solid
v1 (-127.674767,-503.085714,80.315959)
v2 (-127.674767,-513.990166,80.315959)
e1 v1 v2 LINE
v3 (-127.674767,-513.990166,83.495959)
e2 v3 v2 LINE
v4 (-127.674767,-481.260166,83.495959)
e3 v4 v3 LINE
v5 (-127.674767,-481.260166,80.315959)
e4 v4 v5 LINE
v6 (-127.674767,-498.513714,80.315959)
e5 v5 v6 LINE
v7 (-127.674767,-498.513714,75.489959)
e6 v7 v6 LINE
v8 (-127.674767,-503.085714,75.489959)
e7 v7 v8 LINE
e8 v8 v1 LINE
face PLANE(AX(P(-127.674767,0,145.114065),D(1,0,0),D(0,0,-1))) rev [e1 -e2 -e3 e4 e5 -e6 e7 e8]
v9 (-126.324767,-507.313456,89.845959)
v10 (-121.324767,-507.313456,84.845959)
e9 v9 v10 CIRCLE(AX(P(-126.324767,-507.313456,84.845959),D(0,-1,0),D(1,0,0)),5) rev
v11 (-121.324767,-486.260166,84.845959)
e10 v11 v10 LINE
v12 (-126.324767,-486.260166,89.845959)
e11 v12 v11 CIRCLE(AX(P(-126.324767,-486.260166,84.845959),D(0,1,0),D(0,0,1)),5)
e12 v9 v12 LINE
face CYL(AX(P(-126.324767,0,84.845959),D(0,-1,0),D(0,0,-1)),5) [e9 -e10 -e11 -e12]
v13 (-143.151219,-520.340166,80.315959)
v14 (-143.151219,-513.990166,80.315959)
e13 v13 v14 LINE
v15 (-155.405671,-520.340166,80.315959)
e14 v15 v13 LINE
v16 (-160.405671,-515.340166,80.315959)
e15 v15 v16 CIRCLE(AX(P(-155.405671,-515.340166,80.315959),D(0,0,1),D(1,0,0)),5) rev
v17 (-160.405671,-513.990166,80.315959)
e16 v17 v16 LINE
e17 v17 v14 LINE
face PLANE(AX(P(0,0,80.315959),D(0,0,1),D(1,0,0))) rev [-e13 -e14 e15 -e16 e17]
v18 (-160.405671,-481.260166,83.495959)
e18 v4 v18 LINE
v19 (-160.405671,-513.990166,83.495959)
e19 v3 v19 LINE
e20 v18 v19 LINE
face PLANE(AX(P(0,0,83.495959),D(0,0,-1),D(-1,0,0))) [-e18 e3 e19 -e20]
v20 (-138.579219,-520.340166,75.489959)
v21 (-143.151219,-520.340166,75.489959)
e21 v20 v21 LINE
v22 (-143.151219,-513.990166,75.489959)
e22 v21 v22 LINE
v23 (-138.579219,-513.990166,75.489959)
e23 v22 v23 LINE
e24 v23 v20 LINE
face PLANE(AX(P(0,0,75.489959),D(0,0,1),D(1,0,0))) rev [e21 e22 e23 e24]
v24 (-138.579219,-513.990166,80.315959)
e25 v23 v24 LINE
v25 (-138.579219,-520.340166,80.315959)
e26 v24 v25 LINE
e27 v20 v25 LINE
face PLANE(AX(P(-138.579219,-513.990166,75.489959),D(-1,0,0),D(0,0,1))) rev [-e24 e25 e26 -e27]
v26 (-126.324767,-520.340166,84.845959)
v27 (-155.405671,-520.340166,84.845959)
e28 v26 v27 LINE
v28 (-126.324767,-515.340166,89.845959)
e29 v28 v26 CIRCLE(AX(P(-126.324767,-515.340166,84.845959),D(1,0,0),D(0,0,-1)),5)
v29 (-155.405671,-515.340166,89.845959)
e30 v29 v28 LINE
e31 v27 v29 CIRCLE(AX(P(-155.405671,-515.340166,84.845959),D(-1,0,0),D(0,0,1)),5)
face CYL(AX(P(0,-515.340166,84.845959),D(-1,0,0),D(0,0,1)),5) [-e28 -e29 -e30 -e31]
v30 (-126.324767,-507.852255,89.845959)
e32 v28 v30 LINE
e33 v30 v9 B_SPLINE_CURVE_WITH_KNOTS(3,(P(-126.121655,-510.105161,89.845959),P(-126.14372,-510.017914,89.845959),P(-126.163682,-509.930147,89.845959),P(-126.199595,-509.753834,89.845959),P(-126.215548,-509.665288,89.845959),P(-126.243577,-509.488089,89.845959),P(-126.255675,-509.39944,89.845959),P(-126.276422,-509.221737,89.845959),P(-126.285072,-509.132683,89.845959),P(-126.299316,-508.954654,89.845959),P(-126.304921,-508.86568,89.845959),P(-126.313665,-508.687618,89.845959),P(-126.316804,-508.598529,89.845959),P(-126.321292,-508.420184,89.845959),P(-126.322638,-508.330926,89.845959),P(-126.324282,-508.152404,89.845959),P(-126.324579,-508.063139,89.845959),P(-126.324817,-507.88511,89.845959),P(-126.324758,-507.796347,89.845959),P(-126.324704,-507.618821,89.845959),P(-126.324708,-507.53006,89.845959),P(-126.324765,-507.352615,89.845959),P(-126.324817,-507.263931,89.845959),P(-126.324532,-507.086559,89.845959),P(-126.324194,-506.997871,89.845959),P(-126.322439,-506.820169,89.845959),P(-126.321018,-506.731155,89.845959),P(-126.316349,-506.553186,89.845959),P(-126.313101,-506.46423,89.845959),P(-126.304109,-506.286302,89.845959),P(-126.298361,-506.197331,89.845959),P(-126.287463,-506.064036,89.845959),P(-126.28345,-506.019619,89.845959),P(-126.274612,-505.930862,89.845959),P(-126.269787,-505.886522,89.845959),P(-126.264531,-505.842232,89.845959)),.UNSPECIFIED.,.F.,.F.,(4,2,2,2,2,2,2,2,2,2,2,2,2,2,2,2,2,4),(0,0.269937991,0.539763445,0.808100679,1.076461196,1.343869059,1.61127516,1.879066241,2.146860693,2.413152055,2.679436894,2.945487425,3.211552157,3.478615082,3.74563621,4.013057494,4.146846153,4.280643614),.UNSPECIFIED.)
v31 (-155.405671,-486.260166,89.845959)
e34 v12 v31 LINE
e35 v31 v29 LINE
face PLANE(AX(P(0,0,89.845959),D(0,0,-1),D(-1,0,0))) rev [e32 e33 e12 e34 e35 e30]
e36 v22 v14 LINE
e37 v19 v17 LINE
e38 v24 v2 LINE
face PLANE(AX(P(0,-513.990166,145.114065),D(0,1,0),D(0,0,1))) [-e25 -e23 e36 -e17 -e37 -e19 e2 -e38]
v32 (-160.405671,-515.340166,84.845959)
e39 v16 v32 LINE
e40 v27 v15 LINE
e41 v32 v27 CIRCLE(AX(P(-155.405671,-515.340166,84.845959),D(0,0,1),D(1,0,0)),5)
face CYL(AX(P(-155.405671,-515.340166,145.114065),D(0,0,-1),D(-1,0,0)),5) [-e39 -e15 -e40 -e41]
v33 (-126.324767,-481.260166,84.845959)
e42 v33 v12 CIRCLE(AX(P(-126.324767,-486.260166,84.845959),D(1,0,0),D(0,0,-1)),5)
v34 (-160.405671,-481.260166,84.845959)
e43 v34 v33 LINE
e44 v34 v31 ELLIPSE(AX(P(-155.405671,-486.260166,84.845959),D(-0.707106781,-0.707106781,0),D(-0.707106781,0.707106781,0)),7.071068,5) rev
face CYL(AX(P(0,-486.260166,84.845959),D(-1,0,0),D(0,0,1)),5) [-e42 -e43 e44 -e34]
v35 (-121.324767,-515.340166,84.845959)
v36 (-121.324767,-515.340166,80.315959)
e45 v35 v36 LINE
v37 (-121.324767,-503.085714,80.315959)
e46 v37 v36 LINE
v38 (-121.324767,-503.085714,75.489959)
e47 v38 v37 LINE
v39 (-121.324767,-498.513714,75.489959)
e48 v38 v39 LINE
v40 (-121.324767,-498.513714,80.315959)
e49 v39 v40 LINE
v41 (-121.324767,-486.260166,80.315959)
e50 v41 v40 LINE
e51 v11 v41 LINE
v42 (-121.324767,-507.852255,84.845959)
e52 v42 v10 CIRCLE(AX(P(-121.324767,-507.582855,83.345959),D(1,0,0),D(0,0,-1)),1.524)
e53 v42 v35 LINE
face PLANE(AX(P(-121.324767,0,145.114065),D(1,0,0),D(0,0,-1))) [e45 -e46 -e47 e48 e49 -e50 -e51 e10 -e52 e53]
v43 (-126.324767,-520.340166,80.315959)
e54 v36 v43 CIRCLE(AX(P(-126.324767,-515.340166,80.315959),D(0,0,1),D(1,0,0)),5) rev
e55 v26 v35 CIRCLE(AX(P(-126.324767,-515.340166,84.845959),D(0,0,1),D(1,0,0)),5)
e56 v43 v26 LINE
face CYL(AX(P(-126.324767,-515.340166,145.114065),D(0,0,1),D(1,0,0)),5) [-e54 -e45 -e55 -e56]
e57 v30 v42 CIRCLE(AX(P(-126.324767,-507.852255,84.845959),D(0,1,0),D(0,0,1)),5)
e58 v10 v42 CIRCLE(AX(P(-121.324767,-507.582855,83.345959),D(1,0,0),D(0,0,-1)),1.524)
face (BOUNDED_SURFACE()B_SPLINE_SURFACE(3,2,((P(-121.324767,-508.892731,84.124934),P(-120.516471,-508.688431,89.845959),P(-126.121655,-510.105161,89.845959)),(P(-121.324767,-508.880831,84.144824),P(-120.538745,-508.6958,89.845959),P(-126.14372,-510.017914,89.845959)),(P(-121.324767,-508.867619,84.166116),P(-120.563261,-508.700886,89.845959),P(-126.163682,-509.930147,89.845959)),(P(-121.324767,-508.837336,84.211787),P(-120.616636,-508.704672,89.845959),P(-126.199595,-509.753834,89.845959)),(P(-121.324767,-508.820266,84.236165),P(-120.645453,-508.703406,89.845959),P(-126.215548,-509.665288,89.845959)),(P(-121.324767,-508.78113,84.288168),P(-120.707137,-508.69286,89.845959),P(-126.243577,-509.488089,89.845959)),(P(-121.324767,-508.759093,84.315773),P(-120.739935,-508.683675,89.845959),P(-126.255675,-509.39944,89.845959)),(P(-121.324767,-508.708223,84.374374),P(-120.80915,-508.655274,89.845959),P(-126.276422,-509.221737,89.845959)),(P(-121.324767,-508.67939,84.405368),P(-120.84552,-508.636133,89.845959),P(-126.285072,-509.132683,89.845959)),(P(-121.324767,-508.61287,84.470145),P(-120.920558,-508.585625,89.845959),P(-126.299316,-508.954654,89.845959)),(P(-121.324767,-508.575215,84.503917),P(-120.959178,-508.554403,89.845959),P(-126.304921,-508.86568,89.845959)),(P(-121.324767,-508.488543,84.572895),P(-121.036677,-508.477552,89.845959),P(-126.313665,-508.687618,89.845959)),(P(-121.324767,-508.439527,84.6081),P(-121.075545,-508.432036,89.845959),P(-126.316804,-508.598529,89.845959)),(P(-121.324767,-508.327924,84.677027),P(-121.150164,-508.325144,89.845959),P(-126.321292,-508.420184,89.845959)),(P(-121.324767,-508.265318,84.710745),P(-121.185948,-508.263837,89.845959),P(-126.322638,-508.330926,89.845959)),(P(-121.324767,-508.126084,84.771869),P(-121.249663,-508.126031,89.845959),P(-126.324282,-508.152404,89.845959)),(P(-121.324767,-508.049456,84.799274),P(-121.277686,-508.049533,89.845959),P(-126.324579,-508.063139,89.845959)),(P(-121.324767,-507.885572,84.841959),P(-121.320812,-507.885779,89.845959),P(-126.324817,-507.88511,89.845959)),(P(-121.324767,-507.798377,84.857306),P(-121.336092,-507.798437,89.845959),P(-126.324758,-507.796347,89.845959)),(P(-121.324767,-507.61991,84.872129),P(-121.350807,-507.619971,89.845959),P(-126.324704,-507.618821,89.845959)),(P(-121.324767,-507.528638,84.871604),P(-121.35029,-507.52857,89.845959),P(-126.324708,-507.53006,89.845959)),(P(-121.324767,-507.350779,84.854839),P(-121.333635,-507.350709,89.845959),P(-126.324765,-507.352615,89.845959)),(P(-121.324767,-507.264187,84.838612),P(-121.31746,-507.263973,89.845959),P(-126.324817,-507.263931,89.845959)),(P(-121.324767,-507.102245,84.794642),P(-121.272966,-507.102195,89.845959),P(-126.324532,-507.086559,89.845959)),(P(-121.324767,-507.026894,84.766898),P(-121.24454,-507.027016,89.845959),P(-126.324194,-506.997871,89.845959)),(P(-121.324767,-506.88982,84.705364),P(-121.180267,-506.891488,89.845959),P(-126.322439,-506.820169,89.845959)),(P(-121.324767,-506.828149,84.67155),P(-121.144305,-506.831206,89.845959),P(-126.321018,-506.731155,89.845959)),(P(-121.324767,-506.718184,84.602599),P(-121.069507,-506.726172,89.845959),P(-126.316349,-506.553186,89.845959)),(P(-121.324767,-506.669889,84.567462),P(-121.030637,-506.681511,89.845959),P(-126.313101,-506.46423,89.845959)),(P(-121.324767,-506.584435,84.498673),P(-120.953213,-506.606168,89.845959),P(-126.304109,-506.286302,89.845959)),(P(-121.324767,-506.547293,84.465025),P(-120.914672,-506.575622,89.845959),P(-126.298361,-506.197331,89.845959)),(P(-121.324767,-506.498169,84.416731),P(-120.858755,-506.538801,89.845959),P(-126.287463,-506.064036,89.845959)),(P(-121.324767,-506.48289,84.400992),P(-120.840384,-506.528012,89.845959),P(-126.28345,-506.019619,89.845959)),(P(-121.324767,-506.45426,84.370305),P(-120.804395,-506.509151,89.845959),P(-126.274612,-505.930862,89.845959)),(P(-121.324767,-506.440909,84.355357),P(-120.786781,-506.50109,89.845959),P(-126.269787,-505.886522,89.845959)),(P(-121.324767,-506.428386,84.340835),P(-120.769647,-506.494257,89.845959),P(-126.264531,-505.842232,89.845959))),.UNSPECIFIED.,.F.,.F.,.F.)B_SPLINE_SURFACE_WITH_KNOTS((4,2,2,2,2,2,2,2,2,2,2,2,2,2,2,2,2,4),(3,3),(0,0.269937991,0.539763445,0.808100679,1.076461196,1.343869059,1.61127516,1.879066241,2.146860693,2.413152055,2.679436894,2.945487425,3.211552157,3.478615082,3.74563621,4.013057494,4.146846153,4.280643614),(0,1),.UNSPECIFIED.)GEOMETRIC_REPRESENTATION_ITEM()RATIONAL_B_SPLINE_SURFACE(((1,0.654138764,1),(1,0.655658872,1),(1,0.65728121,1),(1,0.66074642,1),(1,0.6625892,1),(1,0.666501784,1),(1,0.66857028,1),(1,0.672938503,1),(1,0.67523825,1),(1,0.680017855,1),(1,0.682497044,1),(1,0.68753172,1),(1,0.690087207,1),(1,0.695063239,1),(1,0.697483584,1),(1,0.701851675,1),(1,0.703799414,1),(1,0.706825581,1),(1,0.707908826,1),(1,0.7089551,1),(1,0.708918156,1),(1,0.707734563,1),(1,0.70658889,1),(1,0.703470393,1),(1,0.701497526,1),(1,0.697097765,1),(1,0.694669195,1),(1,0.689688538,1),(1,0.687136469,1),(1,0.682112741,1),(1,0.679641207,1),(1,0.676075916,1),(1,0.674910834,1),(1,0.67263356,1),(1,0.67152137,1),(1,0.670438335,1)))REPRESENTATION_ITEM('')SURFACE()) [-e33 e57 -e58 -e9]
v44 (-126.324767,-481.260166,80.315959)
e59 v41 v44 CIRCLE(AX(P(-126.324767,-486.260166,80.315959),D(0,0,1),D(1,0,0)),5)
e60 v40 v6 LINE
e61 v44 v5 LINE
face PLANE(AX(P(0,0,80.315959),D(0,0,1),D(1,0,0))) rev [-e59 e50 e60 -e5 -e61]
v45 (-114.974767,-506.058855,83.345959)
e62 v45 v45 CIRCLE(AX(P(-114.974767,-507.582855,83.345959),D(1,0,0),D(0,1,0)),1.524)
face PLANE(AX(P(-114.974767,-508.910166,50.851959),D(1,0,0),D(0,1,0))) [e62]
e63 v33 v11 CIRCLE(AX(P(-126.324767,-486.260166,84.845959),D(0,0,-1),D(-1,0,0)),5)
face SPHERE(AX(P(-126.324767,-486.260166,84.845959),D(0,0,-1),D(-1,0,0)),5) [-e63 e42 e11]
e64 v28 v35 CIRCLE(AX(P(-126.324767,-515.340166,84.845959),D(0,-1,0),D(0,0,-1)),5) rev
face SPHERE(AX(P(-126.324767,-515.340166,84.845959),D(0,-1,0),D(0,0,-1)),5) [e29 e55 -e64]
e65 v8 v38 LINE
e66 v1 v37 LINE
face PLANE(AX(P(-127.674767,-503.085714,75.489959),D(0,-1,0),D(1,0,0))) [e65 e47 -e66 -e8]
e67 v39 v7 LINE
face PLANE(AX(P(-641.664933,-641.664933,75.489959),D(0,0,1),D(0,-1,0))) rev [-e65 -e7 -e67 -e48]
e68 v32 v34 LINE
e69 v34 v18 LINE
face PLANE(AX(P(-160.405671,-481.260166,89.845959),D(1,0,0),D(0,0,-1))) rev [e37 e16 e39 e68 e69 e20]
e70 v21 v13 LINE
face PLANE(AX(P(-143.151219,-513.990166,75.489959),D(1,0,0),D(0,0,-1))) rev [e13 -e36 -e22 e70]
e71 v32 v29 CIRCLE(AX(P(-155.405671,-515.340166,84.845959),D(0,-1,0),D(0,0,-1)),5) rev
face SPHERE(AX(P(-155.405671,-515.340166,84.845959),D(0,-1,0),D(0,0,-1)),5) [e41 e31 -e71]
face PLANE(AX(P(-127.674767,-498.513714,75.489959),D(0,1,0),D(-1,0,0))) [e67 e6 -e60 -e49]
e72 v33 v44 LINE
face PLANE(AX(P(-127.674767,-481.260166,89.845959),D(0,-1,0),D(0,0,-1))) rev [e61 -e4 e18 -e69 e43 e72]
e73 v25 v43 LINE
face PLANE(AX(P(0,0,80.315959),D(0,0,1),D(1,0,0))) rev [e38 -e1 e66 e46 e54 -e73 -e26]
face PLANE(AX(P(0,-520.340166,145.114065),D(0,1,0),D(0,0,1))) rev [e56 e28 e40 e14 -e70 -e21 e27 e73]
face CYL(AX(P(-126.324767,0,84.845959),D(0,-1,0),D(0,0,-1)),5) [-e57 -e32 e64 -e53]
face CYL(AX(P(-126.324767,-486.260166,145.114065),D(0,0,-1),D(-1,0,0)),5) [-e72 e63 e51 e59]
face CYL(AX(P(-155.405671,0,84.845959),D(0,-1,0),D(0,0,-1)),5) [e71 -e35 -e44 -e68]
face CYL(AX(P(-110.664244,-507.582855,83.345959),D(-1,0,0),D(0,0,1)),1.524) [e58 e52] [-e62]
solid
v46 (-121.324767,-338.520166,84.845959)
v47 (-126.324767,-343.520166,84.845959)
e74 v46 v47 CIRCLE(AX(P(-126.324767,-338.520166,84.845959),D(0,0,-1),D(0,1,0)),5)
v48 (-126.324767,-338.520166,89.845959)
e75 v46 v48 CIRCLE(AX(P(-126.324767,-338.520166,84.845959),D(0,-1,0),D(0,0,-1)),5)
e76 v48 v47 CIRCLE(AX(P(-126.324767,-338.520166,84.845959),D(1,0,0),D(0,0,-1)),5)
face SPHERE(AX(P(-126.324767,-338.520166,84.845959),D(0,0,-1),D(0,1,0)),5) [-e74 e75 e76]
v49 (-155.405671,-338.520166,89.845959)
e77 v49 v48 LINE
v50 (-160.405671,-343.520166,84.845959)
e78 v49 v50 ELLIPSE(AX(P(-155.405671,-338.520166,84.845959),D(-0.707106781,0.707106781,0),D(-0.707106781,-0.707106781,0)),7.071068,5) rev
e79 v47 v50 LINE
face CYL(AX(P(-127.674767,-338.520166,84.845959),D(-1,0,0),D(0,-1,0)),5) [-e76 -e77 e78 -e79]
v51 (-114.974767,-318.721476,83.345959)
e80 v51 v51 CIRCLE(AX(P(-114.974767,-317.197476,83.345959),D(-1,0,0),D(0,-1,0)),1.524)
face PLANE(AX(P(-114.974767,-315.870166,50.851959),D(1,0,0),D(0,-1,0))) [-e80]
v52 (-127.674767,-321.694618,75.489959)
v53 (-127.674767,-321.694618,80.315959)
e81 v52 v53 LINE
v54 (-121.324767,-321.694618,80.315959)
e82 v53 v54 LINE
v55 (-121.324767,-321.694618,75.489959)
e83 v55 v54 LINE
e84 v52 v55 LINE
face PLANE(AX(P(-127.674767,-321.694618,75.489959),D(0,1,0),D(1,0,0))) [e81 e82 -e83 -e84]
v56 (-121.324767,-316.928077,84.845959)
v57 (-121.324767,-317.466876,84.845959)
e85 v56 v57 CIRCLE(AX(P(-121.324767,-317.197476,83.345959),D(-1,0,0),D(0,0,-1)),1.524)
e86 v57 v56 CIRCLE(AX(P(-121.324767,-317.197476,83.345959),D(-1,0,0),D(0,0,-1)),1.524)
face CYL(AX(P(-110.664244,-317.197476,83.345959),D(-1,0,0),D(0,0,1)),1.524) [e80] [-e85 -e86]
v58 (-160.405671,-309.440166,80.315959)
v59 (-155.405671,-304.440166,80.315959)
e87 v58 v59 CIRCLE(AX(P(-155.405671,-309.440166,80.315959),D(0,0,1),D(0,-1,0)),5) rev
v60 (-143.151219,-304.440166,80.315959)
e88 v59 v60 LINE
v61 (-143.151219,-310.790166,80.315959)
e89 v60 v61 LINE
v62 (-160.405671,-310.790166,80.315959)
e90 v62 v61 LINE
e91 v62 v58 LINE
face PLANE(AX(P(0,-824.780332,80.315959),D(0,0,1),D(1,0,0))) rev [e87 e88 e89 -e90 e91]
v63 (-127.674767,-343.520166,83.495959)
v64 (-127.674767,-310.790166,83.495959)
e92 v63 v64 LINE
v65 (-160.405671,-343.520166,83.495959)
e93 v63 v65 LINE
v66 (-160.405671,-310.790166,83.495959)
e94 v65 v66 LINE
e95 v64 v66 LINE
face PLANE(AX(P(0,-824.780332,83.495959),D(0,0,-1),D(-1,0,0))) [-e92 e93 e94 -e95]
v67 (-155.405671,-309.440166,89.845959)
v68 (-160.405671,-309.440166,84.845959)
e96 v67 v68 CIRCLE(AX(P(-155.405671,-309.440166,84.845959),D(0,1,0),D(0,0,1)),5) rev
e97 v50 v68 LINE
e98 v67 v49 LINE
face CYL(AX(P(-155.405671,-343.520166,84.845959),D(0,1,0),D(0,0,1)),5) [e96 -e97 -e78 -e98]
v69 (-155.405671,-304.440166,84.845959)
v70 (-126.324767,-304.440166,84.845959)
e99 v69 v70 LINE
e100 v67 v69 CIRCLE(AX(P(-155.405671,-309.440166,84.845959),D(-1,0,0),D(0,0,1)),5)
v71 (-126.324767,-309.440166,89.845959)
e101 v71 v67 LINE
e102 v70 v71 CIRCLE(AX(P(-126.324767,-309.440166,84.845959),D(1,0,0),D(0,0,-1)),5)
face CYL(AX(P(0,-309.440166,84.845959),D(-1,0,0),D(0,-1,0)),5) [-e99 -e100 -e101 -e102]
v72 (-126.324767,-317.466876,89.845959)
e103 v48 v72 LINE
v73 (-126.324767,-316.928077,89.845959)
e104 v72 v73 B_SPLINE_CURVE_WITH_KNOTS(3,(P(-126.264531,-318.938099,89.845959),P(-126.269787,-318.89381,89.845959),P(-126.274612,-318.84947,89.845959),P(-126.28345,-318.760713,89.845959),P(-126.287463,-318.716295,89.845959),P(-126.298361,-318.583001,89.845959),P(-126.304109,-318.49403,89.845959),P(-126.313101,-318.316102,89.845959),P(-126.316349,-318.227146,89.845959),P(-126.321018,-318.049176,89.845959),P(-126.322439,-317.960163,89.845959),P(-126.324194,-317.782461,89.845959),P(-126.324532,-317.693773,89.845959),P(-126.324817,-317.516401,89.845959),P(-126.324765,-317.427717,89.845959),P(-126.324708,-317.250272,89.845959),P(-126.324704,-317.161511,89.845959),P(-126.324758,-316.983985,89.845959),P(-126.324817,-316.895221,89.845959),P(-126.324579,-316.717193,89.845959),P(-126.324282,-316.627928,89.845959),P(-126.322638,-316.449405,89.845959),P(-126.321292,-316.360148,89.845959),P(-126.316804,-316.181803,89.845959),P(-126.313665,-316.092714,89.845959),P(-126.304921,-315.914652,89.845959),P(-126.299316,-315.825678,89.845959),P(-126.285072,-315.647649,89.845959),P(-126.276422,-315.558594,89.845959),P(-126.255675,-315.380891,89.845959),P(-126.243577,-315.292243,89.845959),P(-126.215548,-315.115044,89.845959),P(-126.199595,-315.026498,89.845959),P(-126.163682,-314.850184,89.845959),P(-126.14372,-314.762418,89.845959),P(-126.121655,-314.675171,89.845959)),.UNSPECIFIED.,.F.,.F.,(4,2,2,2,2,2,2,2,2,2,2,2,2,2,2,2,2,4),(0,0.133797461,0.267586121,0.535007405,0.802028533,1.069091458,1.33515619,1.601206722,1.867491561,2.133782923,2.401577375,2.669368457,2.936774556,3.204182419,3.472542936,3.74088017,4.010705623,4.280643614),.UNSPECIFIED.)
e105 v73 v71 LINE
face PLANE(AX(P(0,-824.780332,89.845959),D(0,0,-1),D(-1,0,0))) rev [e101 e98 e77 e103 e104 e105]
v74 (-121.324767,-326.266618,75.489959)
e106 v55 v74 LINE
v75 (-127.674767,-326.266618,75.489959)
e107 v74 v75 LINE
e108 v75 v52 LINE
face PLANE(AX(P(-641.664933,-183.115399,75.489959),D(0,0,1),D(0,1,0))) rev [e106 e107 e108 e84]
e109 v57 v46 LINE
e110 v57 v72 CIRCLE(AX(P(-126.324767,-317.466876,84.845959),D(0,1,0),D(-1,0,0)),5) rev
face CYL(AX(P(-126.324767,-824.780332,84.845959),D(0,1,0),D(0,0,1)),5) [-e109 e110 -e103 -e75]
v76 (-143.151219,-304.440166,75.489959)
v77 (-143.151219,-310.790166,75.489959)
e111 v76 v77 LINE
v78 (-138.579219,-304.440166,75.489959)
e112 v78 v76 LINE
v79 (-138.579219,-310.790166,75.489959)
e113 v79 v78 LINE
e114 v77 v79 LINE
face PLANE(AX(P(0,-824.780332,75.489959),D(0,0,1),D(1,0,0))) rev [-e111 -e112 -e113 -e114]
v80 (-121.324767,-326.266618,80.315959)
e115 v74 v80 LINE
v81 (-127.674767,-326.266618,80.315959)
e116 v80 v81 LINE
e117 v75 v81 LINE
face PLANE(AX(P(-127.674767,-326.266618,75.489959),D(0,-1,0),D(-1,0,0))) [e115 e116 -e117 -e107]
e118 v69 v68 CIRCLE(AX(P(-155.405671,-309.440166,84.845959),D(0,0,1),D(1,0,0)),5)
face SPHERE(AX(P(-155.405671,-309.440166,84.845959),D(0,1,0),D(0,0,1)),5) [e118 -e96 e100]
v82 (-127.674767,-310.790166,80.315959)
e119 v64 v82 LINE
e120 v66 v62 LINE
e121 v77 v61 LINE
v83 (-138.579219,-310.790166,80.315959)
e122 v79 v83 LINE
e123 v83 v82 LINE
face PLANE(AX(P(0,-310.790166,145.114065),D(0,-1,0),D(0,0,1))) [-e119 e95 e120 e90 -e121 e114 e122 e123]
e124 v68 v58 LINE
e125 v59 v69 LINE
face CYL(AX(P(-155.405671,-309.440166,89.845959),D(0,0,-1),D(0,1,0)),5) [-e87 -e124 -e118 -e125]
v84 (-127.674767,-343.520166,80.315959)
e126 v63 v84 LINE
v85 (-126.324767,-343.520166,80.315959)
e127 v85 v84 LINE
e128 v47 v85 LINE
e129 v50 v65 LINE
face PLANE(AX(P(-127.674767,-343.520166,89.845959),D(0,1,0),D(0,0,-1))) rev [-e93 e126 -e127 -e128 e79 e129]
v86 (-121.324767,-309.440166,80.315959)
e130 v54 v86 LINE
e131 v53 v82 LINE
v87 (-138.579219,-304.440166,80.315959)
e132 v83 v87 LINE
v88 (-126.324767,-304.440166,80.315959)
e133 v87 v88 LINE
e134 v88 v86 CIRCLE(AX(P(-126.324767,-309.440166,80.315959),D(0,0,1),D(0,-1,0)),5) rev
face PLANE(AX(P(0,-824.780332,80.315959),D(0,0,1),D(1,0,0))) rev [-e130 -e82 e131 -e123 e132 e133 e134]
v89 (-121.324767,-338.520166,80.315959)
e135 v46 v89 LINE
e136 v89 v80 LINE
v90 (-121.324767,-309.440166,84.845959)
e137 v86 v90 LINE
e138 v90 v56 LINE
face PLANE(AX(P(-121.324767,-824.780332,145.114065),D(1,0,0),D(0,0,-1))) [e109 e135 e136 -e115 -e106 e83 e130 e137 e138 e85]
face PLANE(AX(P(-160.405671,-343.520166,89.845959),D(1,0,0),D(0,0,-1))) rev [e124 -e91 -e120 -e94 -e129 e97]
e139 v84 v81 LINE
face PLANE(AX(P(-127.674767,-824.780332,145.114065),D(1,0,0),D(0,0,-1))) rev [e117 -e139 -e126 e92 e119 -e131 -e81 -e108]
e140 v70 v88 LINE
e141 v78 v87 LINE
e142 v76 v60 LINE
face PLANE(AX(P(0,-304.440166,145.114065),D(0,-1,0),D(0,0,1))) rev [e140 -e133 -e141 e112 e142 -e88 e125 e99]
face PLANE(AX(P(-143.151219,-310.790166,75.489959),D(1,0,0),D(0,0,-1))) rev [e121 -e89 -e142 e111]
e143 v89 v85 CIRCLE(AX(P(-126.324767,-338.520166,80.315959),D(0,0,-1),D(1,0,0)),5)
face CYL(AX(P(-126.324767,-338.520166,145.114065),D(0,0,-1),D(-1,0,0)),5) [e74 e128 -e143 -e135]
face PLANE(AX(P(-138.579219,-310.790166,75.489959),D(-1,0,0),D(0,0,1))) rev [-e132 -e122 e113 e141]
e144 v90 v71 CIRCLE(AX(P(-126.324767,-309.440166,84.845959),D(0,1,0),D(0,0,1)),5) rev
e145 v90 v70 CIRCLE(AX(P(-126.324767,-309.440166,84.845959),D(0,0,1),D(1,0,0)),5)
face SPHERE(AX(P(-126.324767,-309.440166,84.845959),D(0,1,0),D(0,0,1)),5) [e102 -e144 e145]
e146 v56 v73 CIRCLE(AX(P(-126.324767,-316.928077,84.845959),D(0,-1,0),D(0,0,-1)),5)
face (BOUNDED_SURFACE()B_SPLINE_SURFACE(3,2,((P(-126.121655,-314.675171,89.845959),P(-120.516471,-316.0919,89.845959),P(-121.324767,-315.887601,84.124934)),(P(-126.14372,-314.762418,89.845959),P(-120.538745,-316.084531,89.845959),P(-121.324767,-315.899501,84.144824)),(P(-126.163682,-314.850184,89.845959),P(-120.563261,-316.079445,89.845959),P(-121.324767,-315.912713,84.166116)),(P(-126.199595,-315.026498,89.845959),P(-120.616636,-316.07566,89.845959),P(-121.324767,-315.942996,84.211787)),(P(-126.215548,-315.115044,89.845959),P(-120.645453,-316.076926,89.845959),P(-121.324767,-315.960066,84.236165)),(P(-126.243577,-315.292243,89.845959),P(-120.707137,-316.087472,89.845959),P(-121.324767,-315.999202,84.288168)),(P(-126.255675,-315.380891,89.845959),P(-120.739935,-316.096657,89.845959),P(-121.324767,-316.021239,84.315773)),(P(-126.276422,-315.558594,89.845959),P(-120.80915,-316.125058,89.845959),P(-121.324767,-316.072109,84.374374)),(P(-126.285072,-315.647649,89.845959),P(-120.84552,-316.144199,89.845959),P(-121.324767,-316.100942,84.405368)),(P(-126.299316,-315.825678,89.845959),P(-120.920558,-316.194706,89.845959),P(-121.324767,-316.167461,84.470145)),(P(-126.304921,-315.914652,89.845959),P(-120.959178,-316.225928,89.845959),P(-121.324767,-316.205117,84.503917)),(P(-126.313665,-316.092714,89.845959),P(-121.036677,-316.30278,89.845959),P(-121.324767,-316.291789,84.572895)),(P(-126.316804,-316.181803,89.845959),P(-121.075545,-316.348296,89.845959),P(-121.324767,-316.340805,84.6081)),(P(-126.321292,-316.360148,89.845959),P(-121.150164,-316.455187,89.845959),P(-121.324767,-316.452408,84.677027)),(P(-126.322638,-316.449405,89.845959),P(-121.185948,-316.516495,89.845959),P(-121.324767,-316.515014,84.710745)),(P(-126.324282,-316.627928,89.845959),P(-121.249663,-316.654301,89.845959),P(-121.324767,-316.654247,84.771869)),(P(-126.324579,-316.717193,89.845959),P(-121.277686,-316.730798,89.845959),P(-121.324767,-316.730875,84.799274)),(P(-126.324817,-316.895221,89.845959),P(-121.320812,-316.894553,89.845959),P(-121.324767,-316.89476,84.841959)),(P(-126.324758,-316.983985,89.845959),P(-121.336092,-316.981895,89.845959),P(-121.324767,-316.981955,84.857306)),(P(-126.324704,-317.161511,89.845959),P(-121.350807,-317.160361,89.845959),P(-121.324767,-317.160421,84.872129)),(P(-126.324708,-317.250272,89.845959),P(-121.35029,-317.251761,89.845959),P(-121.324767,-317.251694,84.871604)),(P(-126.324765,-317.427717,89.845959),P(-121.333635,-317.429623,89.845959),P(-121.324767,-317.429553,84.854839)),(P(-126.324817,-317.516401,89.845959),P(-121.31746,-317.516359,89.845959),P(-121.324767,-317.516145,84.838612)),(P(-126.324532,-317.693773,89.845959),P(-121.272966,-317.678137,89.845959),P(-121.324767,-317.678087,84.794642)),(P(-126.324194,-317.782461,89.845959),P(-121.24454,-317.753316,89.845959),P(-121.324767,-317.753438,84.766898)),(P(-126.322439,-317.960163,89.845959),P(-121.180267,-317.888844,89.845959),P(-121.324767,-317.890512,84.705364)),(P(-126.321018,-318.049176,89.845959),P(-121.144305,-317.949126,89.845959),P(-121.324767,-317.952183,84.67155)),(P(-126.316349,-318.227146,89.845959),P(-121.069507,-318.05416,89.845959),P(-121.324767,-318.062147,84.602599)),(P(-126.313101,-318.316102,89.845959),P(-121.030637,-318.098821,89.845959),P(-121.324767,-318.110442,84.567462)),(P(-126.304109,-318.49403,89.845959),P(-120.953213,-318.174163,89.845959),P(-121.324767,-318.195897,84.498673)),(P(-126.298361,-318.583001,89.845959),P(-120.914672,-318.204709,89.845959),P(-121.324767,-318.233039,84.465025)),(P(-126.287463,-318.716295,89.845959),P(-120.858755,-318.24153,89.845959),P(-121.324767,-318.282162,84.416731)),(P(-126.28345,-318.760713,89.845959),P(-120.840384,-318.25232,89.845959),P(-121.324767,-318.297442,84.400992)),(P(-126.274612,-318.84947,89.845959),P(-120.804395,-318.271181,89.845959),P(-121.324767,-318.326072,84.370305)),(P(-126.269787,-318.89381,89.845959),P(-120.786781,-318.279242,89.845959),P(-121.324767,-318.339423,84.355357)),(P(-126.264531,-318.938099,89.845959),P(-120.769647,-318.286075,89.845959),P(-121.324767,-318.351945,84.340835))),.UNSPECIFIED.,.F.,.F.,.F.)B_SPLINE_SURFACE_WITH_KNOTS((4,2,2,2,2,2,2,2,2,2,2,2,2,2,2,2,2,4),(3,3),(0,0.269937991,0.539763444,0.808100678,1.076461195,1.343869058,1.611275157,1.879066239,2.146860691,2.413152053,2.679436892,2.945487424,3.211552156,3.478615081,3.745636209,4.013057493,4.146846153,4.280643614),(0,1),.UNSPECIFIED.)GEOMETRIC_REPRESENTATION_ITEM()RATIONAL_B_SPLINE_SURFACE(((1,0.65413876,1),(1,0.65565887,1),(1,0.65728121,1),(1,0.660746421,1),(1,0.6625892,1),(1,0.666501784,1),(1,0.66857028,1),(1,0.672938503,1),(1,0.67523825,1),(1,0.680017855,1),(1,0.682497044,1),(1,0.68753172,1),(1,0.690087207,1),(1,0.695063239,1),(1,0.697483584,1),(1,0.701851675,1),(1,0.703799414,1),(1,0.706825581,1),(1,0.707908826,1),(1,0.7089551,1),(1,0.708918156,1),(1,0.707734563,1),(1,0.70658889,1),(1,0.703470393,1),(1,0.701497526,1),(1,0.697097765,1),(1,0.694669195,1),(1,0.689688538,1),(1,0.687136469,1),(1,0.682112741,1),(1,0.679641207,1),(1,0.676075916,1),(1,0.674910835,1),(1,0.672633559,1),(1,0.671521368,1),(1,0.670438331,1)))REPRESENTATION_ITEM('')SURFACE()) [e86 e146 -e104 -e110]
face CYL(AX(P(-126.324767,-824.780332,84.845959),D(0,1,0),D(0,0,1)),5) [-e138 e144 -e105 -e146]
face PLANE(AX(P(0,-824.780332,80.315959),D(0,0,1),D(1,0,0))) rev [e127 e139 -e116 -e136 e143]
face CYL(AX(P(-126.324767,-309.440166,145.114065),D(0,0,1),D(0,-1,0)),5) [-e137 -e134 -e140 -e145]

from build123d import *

# Parameters (mm, degrees)
SKETCH6_W              = 32.730904613
SKETCH6_H              = 32.73
LID_EXTRUSION_DEPTH    = 6.35
LEG_EXTRUSION_DEPTH    = 9.53
SKETCH8_W              = 4.572
SKETCH8_H              = 6.35
LOCKING_PIN_DEPTH      = 4.826
SKETCH9_R              = 1.524
LOCKING_CYLINDER_DEPTH = 6.35
FILLET2_R              = 5
FILLET3_R              = 5


# Read off the part's stored shape, not the designer's step: Leg Extrusion
with BuildPart() as part:
    # Sketch6 → Lid Extrusion (new body)
    with BuildSketch(Plane.XY.offset(83.495959084)):
        with Locations((-144.040218944, -497.625165889)):
            Rectangle(SKETCH6_W, SKETCH6_H)
    extrude(amount=LID_EXTRUSION_DEPTH)

    # Leg Extrusion outline → Leg Extrusion (add)
    with BuildSketch(Plane.XY.offset(80.315959084)):
        with BuildLine():
            Line((-160.405671251, -513.990165889), (-160.405671251, -520.340165889))
            Line((-160.405671251, -520.340165889), (-121.324766638, -520.340165889))
            Line((-121.324766638, -520.340165889), (-121.324766638, -486.260165889))
            ThreePointArc((-121.324766638, -486.260165889), (-122.789232732, -482.724631983), (-126.324766638, -481.260165889))
            Line((-126.324766638, -481.260165889), (-127.674766638, -481.260165889))
            Line((-127.674766638, -481.260165889), (-127.674766638, -513.990165889))
            Line((-127.674766638, -513.990165889), (-160.405671251, -513.990165889))
        make_face()
    extrude(amount=LEG_EXTRUSION_DEPTH)

    # Sketch8 → Locking Pin (add)
    with BuildSketch(Plane(origin=(0, 0, 80.315959084), x_dir=(-1, 0, 0), z_dir=(0, 0, -1))):
        with Locations((140.865218944, -517.165165889)):
            Rectangle(SKETCH8_W, SKETCH8_H)
    locking_pin = extrude(amount=LOCKING_PIN_DEPTH)

    # Sketch9 → Locking cylinder (add)
    with BuildSketch(Plane(origin=(-121.324766638, 0, 0), x_dir=(0, 0, -1), z_dir=(1, 0, 0))):
        with Locations(Location((-83.345959084, -507.582855381, 0), (0, 0, 90))):
            Circle(SKETCH9_R)
    extrude(amount=LOCKING_CYLINDER_DEPTH)

    # locking pin mirror: Locking Pin across plane
    add(locking_pin.mirror(Plane(origin=(-320.832466263, -320.832466263, 0), x_dir=(0, 0, 1), z_dir=(-0.7071067811865475, -0.7071067811865477, 0))))


with BuildPart() as body_2:
    # Top mirror: mirrored copy
    add(part.part.mirror(Plane(origin=(0, -412.390165889, 0), x_dir=(0, 0, 1), z_dir=(0, -1, 0))))

    # Fillet2
    fillet2_edges = [body_2.edges().sort_by_distance(p)[0] for p in [
        (-160.405671251, -327.155165889, 89.845959084),
        (-140.865218944, -304.440165889, 89.845959084),
        (-160.405671251, -304.440165889, 85.080959084),
        (-121.324766638, -304.440165889, 85.080959084),
        (-122.789232732, -342.055699795, 89.845959084),
        (-144.040218944, -343.520165889, 89.845959084),
        (-121.324766638, -321.480165889, 89.845959084),
    ]]
    fillet(fillet2_edges, radius=FILLET2_R)


with BuildPart() as part_1:
    add(part.part)

    # Fillet3
    fillet3_edges = [part_1.edges().sort_by_distance(p)[0] for p in [
        (-160.405671251, -497.625165889, 89.845959084),
        (-140.865218944, -520.340165889, 89.845959084),
        (-160.405671251, -520.340165889, 85.080959084),
        (-121.324766638, -520.340165889, 85.080959084),
        (-122.789232732, -482.724631983, 89.845959084),
        (-144.040218944, -481.260165889, 89.845959084),
        (-121.324766638, -503.300165889, 89.845959084),
    ]]
    fillet(fillet3_edges, radius=FILLET3_R)


solid = Compound([body_2.part, part_1.part])
